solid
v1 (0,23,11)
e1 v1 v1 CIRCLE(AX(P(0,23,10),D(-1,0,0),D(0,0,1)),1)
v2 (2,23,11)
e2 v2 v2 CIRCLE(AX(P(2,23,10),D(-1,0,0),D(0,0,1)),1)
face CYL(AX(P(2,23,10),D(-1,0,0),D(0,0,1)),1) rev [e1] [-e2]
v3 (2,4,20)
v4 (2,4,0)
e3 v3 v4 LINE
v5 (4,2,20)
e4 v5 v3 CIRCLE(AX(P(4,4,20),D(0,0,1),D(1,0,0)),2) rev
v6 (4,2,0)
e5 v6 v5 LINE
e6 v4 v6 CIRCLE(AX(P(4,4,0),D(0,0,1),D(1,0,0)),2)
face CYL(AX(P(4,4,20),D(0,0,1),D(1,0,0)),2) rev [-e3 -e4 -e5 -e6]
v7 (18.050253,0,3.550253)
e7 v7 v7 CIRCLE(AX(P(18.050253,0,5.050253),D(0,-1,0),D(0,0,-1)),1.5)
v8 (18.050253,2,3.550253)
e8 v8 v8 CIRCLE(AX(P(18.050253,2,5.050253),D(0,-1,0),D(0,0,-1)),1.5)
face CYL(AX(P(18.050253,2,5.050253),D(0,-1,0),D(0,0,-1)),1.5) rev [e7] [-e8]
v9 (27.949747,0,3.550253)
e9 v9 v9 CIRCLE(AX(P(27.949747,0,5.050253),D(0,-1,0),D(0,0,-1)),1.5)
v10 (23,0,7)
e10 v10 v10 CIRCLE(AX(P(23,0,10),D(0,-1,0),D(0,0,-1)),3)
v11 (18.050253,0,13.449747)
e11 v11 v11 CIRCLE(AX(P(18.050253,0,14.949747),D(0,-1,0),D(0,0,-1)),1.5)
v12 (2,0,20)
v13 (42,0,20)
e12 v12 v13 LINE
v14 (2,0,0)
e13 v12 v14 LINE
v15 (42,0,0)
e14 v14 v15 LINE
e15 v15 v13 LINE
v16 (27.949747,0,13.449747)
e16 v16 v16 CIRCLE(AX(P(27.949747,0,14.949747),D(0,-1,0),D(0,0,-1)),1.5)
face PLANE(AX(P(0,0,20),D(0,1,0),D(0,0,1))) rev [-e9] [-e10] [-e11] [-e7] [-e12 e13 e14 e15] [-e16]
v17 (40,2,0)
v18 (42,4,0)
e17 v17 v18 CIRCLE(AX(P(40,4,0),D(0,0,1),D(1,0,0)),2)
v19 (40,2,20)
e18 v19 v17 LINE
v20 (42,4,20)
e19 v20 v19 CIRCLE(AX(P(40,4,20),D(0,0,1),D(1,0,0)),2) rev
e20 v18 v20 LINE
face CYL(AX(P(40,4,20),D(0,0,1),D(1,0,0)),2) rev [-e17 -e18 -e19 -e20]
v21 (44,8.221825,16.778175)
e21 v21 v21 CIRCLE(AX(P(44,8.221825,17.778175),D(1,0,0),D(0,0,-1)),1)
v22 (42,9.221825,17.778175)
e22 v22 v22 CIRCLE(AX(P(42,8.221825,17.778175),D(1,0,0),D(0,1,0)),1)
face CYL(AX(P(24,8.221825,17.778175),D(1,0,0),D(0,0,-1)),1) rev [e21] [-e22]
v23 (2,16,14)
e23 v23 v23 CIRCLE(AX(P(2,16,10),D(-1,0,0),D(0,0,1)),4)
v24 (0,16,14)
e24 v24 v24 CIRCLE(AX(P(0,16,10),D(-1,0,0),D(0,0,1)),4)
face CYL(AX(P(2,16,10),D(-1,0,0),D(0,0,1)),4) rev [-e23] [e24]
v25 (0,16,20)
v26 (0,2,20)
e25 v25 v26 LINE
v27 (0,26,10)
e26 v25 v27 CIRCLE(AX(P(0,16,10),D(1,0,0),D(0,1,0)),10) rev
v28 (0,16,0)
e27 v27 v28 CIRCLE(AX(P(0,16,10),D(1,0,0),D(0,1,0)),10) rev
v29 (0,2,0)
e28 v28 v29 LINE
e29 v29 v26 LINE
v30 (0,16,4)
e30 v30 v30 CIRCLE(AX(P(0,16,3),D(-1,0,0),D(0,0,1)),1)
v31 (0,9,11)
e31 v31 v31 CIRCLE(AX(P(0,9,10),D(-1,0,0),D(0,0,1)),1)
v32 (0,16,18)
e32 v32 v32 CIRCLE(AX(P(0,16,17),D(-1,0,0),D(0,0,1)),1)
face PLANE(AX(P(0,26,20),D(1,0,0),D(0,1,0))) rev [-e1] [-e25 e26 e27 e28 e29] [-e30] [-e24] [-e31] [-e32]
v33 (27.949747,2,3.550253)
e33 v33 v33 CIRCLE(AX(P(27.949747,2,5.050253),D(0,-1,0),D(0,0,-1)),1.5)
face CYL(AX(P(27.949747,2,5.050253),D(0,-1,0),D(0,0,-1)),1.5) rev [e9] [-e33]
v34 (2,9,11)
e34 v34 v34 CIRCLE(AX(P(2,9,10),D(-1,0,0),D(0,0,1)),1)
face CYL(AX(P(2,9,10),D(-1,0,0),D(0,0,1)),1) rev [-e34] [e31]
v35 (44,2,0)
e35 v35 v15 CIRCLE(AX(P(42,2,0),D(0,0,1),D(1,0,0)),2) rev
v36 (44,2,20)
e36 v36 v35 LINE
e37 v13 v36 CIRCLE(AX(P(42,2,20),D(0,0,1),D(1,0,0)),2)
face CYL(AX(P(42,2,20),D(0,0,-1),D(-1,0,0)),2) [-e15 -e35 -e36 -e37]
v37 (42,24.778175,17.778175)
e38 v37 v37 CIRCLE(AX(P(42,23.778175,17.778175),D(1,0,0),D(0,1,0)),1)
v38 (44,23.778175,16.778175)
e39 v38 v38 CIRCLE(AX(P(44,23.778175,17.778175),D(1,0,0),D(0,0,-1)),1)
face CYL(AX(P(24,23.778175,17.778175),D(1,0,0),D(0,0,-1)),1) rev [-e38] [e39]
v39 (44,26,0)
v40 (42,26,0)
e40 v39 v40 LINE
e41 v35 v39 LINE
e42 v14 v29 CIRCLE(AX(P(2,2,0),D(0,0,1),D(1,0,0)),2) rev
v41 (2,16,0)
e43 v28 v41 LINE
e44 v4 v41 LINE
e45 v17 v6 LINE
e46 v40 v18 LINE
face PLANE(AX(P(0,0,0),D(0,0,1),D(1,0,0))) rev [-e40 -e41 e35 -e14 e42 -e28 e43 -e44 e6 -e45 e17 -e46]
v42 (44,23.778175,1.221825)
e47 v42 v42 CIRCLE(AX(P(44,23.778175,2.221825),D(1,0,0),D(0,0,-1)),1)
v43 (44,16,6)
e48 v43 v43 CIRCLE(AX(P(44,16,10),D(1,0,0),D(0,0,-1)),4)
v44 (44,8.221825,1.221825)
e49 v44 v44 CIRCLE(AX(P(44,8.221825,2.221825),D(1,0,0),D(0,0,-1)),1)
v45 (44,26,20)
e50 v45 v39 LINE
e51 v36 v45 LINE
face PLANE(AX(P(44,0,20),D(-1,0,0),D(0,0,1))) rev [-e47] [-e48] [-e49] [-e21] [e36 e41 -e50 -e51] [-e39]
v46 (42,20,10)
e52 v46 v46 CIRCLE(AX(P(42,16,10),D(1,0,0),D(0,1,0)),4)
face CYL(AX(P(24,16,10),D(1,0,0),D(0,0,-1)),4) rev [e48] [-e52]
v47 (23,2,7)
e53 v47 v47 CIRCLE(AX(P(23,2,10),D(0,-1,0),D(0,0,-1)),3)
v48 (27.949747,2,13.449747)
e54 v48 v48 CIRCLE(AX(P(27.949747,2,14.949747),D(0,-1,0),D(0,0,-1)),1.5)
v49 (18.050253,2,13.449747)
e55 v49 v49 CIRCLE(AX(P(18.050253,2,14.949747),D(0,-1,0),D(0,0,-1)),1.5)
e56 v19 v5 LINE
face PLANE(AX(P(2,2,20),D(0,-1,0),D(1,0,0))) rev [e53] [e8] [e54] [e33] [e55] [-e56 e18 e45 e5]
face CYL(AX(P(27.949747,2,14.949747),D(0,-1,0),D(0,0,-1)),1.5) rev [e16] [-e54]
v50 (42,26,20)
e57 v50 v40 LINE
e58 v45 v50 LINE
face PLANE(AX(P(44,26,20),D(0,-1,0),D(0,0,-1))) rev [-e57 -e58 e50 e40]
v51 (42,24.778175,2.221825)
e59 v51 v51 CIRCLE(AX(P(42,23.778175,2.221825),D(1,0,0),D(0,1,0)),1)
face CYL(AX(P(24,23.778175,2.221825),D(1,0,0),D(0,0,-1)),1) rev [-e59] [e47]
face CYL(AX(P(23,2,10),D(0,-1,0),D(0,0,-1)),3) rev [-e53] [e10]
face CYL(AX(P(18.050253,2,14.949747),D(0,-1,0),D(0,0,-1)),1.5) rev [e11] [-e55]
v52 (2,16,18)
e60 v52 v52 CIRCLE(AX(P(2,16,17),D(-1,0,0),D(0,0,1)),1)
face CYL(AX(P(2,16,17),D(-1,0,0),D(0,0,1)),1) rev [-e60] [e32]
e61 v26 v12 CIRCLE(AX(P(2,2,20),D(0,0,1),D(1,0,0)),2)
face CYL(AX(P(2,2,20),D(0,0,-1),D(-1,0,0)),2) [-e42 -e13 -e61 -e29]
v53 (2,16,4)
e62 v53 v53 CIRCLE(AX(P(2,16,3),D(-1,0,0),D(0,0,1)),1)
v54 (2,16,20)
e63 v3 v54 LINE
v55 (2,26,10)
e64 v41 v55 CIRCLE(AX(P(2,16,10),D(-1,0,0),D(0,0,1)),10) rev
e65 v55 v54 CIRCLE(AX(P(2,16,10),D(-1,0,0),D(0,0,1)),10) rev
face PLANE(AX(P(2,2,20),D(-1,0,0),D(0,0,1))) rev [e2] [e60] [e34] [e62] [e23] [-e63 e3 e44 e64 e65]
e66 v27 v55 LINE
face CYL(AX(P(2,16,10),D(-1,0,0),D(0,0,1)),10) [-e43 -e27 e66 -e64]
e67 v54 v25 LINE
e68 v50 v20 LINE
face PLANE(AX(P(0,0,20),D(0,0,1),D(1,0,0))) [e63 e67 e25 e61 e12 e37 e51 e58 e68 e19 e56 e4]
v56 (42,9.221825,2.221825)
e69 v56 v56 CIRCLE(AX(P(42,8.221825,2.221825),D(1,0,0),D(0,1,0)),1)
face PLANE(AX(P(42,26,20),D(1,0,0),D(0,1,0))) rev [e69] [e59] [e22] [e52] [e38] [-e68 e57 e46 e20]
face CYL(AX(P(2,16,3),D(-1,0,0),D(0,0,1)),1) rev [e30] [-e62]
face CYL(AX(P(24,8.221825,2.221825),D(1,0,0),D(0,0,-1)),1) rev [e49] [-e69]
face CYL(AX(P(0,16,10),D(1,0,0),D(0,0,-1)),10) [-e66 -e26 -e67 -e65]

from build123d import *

# Parameters (mm, degrees)
EXTRUDE_1051_DEPTH     = 20
SKETCH2_R              = 4
SKETCH2_R_2            = 1
CUT_EXTRUDE_1_DEPTH    = 2
CUT_EXTRUDE_START      = -20
SKETCH3_R              = 1
SKETCH3_R_2            = 4
CUT_EXTRUDE_2_DEPTH    = 20
SKETCH4_R              = 3
SKETCH4_R_2            = 1.5
CUT_EXTRUDE_2789_DEPTH = 2
FILLET1_R              = 10
FILLET2_R              = 2


with BuildPart() as part:
    # Sketch1 → Extrude 1051 (new body)
    with BuildSketch(Plane.XY):
        Polygon((0, 0), (44, 0), (44, 26), (42, 26), (42, 2), (2, 2), (2, 26), (0, 26), align=None)
    extrude(amount=EXTRUDE_1051_DEPTH)

    # Sketch2 → Отверстия под ось и винты 1 (cut)
    with BuildSketch(Plane.ZY):
        with Locations((10, 16)):
            Circle(SKETCH2_R)
        with Locations((10, 23)):
            Circle(SKETCH2_R_2)
        with Locations((17, 16)):
            Circle(SKETCH2_R_2)
        with Locations((10, 9)):
            Circle(SKETCH2_R_2)
        with Locations((3, 16)):
            Circle(SKETCH2_R_2)
    extrude(amount=-CUT_EXTRUDE_1_DEPTH, mode=Mode.SUBTRACT)

    # Sketch3 → Отверстия под ось и винты 2 (cut)
    with BuildSketch(Plane(origin=(44, 0, 0), x_dir=(0, 0, -1), z_dir=(1, 0, 0)).offset(CUT_EXTRUDE_START)):
        with Locations((-17.778174593, 23.778174593)):
            Circle(SKETCH3_R)
        with Locations(Location((-10, 16, 0), (0, 0, 180))):
            Circle(SKETCH3_R_2)
        with Locations((-2.221825407, 23.778174593)):
            Circle(SKETCH3_R)
        with Locations((-2.221825407, 8.221825407)):
            Circle(SKETCH3_R)
        with Locations((-17.778174593, 8.221825407)):
            Circle(SKETCH3_R)
    extrude(amount=CUT_EXTRUDE_2_DEPTH, mode=Mode.SUBTRACT)

    # Sketch4 → Cut-Extrude 2789 (cut)
    with BuildSketch(Plane.XZ):
        with Locations(Location((23, 10, 0), (0, 0, 270))):
            Circle(SKETCH4_R)
        with Locations(Location((18.050252532, 5.050252532, 0), (0, 0, 270))):
            Circle(SKETCH4_R_2)
        with Locations(Location((27.949747468, 5.050252532, 0), (0, 0, 270))):
            Circle(SKETCH4_R_2)
        with Locations(Location((18.050252532, 14.949747468, 0), (0, 0, 270))):
            Circle(SKETCH4_R_2)
        with Locations(Location((27.949747468, 14.949747468, 0), (0, 0, 270))):
            Circle(SKETCH4_R_2)
    extrude(amount=-CUT_EXTRUDE_2789_DEPTH, mode=Mode.SUBTRACT)

    # Fillet1
    fillet1_edges = [part.edges().sort_by_distance(p)[0] for p in [
        (1, 26, 0),
        (1, 26, 20),
    ]]
    fillet(fillet1_edges, radius=FILLET1_R - 0.0001)  # a hair under: the kernel refuses the full size

    # Fillet2
    fillet2_edges = [part.edges().sort_by_distance(p)[0] for p in [
        (44, 0, 10),
        (0, 0, 10),
        (2, 2, 10),
        (42, 2, 10),
    ]]
    fillet(fillet2_edges, radius=FILLET2_R)


solid = part.part
